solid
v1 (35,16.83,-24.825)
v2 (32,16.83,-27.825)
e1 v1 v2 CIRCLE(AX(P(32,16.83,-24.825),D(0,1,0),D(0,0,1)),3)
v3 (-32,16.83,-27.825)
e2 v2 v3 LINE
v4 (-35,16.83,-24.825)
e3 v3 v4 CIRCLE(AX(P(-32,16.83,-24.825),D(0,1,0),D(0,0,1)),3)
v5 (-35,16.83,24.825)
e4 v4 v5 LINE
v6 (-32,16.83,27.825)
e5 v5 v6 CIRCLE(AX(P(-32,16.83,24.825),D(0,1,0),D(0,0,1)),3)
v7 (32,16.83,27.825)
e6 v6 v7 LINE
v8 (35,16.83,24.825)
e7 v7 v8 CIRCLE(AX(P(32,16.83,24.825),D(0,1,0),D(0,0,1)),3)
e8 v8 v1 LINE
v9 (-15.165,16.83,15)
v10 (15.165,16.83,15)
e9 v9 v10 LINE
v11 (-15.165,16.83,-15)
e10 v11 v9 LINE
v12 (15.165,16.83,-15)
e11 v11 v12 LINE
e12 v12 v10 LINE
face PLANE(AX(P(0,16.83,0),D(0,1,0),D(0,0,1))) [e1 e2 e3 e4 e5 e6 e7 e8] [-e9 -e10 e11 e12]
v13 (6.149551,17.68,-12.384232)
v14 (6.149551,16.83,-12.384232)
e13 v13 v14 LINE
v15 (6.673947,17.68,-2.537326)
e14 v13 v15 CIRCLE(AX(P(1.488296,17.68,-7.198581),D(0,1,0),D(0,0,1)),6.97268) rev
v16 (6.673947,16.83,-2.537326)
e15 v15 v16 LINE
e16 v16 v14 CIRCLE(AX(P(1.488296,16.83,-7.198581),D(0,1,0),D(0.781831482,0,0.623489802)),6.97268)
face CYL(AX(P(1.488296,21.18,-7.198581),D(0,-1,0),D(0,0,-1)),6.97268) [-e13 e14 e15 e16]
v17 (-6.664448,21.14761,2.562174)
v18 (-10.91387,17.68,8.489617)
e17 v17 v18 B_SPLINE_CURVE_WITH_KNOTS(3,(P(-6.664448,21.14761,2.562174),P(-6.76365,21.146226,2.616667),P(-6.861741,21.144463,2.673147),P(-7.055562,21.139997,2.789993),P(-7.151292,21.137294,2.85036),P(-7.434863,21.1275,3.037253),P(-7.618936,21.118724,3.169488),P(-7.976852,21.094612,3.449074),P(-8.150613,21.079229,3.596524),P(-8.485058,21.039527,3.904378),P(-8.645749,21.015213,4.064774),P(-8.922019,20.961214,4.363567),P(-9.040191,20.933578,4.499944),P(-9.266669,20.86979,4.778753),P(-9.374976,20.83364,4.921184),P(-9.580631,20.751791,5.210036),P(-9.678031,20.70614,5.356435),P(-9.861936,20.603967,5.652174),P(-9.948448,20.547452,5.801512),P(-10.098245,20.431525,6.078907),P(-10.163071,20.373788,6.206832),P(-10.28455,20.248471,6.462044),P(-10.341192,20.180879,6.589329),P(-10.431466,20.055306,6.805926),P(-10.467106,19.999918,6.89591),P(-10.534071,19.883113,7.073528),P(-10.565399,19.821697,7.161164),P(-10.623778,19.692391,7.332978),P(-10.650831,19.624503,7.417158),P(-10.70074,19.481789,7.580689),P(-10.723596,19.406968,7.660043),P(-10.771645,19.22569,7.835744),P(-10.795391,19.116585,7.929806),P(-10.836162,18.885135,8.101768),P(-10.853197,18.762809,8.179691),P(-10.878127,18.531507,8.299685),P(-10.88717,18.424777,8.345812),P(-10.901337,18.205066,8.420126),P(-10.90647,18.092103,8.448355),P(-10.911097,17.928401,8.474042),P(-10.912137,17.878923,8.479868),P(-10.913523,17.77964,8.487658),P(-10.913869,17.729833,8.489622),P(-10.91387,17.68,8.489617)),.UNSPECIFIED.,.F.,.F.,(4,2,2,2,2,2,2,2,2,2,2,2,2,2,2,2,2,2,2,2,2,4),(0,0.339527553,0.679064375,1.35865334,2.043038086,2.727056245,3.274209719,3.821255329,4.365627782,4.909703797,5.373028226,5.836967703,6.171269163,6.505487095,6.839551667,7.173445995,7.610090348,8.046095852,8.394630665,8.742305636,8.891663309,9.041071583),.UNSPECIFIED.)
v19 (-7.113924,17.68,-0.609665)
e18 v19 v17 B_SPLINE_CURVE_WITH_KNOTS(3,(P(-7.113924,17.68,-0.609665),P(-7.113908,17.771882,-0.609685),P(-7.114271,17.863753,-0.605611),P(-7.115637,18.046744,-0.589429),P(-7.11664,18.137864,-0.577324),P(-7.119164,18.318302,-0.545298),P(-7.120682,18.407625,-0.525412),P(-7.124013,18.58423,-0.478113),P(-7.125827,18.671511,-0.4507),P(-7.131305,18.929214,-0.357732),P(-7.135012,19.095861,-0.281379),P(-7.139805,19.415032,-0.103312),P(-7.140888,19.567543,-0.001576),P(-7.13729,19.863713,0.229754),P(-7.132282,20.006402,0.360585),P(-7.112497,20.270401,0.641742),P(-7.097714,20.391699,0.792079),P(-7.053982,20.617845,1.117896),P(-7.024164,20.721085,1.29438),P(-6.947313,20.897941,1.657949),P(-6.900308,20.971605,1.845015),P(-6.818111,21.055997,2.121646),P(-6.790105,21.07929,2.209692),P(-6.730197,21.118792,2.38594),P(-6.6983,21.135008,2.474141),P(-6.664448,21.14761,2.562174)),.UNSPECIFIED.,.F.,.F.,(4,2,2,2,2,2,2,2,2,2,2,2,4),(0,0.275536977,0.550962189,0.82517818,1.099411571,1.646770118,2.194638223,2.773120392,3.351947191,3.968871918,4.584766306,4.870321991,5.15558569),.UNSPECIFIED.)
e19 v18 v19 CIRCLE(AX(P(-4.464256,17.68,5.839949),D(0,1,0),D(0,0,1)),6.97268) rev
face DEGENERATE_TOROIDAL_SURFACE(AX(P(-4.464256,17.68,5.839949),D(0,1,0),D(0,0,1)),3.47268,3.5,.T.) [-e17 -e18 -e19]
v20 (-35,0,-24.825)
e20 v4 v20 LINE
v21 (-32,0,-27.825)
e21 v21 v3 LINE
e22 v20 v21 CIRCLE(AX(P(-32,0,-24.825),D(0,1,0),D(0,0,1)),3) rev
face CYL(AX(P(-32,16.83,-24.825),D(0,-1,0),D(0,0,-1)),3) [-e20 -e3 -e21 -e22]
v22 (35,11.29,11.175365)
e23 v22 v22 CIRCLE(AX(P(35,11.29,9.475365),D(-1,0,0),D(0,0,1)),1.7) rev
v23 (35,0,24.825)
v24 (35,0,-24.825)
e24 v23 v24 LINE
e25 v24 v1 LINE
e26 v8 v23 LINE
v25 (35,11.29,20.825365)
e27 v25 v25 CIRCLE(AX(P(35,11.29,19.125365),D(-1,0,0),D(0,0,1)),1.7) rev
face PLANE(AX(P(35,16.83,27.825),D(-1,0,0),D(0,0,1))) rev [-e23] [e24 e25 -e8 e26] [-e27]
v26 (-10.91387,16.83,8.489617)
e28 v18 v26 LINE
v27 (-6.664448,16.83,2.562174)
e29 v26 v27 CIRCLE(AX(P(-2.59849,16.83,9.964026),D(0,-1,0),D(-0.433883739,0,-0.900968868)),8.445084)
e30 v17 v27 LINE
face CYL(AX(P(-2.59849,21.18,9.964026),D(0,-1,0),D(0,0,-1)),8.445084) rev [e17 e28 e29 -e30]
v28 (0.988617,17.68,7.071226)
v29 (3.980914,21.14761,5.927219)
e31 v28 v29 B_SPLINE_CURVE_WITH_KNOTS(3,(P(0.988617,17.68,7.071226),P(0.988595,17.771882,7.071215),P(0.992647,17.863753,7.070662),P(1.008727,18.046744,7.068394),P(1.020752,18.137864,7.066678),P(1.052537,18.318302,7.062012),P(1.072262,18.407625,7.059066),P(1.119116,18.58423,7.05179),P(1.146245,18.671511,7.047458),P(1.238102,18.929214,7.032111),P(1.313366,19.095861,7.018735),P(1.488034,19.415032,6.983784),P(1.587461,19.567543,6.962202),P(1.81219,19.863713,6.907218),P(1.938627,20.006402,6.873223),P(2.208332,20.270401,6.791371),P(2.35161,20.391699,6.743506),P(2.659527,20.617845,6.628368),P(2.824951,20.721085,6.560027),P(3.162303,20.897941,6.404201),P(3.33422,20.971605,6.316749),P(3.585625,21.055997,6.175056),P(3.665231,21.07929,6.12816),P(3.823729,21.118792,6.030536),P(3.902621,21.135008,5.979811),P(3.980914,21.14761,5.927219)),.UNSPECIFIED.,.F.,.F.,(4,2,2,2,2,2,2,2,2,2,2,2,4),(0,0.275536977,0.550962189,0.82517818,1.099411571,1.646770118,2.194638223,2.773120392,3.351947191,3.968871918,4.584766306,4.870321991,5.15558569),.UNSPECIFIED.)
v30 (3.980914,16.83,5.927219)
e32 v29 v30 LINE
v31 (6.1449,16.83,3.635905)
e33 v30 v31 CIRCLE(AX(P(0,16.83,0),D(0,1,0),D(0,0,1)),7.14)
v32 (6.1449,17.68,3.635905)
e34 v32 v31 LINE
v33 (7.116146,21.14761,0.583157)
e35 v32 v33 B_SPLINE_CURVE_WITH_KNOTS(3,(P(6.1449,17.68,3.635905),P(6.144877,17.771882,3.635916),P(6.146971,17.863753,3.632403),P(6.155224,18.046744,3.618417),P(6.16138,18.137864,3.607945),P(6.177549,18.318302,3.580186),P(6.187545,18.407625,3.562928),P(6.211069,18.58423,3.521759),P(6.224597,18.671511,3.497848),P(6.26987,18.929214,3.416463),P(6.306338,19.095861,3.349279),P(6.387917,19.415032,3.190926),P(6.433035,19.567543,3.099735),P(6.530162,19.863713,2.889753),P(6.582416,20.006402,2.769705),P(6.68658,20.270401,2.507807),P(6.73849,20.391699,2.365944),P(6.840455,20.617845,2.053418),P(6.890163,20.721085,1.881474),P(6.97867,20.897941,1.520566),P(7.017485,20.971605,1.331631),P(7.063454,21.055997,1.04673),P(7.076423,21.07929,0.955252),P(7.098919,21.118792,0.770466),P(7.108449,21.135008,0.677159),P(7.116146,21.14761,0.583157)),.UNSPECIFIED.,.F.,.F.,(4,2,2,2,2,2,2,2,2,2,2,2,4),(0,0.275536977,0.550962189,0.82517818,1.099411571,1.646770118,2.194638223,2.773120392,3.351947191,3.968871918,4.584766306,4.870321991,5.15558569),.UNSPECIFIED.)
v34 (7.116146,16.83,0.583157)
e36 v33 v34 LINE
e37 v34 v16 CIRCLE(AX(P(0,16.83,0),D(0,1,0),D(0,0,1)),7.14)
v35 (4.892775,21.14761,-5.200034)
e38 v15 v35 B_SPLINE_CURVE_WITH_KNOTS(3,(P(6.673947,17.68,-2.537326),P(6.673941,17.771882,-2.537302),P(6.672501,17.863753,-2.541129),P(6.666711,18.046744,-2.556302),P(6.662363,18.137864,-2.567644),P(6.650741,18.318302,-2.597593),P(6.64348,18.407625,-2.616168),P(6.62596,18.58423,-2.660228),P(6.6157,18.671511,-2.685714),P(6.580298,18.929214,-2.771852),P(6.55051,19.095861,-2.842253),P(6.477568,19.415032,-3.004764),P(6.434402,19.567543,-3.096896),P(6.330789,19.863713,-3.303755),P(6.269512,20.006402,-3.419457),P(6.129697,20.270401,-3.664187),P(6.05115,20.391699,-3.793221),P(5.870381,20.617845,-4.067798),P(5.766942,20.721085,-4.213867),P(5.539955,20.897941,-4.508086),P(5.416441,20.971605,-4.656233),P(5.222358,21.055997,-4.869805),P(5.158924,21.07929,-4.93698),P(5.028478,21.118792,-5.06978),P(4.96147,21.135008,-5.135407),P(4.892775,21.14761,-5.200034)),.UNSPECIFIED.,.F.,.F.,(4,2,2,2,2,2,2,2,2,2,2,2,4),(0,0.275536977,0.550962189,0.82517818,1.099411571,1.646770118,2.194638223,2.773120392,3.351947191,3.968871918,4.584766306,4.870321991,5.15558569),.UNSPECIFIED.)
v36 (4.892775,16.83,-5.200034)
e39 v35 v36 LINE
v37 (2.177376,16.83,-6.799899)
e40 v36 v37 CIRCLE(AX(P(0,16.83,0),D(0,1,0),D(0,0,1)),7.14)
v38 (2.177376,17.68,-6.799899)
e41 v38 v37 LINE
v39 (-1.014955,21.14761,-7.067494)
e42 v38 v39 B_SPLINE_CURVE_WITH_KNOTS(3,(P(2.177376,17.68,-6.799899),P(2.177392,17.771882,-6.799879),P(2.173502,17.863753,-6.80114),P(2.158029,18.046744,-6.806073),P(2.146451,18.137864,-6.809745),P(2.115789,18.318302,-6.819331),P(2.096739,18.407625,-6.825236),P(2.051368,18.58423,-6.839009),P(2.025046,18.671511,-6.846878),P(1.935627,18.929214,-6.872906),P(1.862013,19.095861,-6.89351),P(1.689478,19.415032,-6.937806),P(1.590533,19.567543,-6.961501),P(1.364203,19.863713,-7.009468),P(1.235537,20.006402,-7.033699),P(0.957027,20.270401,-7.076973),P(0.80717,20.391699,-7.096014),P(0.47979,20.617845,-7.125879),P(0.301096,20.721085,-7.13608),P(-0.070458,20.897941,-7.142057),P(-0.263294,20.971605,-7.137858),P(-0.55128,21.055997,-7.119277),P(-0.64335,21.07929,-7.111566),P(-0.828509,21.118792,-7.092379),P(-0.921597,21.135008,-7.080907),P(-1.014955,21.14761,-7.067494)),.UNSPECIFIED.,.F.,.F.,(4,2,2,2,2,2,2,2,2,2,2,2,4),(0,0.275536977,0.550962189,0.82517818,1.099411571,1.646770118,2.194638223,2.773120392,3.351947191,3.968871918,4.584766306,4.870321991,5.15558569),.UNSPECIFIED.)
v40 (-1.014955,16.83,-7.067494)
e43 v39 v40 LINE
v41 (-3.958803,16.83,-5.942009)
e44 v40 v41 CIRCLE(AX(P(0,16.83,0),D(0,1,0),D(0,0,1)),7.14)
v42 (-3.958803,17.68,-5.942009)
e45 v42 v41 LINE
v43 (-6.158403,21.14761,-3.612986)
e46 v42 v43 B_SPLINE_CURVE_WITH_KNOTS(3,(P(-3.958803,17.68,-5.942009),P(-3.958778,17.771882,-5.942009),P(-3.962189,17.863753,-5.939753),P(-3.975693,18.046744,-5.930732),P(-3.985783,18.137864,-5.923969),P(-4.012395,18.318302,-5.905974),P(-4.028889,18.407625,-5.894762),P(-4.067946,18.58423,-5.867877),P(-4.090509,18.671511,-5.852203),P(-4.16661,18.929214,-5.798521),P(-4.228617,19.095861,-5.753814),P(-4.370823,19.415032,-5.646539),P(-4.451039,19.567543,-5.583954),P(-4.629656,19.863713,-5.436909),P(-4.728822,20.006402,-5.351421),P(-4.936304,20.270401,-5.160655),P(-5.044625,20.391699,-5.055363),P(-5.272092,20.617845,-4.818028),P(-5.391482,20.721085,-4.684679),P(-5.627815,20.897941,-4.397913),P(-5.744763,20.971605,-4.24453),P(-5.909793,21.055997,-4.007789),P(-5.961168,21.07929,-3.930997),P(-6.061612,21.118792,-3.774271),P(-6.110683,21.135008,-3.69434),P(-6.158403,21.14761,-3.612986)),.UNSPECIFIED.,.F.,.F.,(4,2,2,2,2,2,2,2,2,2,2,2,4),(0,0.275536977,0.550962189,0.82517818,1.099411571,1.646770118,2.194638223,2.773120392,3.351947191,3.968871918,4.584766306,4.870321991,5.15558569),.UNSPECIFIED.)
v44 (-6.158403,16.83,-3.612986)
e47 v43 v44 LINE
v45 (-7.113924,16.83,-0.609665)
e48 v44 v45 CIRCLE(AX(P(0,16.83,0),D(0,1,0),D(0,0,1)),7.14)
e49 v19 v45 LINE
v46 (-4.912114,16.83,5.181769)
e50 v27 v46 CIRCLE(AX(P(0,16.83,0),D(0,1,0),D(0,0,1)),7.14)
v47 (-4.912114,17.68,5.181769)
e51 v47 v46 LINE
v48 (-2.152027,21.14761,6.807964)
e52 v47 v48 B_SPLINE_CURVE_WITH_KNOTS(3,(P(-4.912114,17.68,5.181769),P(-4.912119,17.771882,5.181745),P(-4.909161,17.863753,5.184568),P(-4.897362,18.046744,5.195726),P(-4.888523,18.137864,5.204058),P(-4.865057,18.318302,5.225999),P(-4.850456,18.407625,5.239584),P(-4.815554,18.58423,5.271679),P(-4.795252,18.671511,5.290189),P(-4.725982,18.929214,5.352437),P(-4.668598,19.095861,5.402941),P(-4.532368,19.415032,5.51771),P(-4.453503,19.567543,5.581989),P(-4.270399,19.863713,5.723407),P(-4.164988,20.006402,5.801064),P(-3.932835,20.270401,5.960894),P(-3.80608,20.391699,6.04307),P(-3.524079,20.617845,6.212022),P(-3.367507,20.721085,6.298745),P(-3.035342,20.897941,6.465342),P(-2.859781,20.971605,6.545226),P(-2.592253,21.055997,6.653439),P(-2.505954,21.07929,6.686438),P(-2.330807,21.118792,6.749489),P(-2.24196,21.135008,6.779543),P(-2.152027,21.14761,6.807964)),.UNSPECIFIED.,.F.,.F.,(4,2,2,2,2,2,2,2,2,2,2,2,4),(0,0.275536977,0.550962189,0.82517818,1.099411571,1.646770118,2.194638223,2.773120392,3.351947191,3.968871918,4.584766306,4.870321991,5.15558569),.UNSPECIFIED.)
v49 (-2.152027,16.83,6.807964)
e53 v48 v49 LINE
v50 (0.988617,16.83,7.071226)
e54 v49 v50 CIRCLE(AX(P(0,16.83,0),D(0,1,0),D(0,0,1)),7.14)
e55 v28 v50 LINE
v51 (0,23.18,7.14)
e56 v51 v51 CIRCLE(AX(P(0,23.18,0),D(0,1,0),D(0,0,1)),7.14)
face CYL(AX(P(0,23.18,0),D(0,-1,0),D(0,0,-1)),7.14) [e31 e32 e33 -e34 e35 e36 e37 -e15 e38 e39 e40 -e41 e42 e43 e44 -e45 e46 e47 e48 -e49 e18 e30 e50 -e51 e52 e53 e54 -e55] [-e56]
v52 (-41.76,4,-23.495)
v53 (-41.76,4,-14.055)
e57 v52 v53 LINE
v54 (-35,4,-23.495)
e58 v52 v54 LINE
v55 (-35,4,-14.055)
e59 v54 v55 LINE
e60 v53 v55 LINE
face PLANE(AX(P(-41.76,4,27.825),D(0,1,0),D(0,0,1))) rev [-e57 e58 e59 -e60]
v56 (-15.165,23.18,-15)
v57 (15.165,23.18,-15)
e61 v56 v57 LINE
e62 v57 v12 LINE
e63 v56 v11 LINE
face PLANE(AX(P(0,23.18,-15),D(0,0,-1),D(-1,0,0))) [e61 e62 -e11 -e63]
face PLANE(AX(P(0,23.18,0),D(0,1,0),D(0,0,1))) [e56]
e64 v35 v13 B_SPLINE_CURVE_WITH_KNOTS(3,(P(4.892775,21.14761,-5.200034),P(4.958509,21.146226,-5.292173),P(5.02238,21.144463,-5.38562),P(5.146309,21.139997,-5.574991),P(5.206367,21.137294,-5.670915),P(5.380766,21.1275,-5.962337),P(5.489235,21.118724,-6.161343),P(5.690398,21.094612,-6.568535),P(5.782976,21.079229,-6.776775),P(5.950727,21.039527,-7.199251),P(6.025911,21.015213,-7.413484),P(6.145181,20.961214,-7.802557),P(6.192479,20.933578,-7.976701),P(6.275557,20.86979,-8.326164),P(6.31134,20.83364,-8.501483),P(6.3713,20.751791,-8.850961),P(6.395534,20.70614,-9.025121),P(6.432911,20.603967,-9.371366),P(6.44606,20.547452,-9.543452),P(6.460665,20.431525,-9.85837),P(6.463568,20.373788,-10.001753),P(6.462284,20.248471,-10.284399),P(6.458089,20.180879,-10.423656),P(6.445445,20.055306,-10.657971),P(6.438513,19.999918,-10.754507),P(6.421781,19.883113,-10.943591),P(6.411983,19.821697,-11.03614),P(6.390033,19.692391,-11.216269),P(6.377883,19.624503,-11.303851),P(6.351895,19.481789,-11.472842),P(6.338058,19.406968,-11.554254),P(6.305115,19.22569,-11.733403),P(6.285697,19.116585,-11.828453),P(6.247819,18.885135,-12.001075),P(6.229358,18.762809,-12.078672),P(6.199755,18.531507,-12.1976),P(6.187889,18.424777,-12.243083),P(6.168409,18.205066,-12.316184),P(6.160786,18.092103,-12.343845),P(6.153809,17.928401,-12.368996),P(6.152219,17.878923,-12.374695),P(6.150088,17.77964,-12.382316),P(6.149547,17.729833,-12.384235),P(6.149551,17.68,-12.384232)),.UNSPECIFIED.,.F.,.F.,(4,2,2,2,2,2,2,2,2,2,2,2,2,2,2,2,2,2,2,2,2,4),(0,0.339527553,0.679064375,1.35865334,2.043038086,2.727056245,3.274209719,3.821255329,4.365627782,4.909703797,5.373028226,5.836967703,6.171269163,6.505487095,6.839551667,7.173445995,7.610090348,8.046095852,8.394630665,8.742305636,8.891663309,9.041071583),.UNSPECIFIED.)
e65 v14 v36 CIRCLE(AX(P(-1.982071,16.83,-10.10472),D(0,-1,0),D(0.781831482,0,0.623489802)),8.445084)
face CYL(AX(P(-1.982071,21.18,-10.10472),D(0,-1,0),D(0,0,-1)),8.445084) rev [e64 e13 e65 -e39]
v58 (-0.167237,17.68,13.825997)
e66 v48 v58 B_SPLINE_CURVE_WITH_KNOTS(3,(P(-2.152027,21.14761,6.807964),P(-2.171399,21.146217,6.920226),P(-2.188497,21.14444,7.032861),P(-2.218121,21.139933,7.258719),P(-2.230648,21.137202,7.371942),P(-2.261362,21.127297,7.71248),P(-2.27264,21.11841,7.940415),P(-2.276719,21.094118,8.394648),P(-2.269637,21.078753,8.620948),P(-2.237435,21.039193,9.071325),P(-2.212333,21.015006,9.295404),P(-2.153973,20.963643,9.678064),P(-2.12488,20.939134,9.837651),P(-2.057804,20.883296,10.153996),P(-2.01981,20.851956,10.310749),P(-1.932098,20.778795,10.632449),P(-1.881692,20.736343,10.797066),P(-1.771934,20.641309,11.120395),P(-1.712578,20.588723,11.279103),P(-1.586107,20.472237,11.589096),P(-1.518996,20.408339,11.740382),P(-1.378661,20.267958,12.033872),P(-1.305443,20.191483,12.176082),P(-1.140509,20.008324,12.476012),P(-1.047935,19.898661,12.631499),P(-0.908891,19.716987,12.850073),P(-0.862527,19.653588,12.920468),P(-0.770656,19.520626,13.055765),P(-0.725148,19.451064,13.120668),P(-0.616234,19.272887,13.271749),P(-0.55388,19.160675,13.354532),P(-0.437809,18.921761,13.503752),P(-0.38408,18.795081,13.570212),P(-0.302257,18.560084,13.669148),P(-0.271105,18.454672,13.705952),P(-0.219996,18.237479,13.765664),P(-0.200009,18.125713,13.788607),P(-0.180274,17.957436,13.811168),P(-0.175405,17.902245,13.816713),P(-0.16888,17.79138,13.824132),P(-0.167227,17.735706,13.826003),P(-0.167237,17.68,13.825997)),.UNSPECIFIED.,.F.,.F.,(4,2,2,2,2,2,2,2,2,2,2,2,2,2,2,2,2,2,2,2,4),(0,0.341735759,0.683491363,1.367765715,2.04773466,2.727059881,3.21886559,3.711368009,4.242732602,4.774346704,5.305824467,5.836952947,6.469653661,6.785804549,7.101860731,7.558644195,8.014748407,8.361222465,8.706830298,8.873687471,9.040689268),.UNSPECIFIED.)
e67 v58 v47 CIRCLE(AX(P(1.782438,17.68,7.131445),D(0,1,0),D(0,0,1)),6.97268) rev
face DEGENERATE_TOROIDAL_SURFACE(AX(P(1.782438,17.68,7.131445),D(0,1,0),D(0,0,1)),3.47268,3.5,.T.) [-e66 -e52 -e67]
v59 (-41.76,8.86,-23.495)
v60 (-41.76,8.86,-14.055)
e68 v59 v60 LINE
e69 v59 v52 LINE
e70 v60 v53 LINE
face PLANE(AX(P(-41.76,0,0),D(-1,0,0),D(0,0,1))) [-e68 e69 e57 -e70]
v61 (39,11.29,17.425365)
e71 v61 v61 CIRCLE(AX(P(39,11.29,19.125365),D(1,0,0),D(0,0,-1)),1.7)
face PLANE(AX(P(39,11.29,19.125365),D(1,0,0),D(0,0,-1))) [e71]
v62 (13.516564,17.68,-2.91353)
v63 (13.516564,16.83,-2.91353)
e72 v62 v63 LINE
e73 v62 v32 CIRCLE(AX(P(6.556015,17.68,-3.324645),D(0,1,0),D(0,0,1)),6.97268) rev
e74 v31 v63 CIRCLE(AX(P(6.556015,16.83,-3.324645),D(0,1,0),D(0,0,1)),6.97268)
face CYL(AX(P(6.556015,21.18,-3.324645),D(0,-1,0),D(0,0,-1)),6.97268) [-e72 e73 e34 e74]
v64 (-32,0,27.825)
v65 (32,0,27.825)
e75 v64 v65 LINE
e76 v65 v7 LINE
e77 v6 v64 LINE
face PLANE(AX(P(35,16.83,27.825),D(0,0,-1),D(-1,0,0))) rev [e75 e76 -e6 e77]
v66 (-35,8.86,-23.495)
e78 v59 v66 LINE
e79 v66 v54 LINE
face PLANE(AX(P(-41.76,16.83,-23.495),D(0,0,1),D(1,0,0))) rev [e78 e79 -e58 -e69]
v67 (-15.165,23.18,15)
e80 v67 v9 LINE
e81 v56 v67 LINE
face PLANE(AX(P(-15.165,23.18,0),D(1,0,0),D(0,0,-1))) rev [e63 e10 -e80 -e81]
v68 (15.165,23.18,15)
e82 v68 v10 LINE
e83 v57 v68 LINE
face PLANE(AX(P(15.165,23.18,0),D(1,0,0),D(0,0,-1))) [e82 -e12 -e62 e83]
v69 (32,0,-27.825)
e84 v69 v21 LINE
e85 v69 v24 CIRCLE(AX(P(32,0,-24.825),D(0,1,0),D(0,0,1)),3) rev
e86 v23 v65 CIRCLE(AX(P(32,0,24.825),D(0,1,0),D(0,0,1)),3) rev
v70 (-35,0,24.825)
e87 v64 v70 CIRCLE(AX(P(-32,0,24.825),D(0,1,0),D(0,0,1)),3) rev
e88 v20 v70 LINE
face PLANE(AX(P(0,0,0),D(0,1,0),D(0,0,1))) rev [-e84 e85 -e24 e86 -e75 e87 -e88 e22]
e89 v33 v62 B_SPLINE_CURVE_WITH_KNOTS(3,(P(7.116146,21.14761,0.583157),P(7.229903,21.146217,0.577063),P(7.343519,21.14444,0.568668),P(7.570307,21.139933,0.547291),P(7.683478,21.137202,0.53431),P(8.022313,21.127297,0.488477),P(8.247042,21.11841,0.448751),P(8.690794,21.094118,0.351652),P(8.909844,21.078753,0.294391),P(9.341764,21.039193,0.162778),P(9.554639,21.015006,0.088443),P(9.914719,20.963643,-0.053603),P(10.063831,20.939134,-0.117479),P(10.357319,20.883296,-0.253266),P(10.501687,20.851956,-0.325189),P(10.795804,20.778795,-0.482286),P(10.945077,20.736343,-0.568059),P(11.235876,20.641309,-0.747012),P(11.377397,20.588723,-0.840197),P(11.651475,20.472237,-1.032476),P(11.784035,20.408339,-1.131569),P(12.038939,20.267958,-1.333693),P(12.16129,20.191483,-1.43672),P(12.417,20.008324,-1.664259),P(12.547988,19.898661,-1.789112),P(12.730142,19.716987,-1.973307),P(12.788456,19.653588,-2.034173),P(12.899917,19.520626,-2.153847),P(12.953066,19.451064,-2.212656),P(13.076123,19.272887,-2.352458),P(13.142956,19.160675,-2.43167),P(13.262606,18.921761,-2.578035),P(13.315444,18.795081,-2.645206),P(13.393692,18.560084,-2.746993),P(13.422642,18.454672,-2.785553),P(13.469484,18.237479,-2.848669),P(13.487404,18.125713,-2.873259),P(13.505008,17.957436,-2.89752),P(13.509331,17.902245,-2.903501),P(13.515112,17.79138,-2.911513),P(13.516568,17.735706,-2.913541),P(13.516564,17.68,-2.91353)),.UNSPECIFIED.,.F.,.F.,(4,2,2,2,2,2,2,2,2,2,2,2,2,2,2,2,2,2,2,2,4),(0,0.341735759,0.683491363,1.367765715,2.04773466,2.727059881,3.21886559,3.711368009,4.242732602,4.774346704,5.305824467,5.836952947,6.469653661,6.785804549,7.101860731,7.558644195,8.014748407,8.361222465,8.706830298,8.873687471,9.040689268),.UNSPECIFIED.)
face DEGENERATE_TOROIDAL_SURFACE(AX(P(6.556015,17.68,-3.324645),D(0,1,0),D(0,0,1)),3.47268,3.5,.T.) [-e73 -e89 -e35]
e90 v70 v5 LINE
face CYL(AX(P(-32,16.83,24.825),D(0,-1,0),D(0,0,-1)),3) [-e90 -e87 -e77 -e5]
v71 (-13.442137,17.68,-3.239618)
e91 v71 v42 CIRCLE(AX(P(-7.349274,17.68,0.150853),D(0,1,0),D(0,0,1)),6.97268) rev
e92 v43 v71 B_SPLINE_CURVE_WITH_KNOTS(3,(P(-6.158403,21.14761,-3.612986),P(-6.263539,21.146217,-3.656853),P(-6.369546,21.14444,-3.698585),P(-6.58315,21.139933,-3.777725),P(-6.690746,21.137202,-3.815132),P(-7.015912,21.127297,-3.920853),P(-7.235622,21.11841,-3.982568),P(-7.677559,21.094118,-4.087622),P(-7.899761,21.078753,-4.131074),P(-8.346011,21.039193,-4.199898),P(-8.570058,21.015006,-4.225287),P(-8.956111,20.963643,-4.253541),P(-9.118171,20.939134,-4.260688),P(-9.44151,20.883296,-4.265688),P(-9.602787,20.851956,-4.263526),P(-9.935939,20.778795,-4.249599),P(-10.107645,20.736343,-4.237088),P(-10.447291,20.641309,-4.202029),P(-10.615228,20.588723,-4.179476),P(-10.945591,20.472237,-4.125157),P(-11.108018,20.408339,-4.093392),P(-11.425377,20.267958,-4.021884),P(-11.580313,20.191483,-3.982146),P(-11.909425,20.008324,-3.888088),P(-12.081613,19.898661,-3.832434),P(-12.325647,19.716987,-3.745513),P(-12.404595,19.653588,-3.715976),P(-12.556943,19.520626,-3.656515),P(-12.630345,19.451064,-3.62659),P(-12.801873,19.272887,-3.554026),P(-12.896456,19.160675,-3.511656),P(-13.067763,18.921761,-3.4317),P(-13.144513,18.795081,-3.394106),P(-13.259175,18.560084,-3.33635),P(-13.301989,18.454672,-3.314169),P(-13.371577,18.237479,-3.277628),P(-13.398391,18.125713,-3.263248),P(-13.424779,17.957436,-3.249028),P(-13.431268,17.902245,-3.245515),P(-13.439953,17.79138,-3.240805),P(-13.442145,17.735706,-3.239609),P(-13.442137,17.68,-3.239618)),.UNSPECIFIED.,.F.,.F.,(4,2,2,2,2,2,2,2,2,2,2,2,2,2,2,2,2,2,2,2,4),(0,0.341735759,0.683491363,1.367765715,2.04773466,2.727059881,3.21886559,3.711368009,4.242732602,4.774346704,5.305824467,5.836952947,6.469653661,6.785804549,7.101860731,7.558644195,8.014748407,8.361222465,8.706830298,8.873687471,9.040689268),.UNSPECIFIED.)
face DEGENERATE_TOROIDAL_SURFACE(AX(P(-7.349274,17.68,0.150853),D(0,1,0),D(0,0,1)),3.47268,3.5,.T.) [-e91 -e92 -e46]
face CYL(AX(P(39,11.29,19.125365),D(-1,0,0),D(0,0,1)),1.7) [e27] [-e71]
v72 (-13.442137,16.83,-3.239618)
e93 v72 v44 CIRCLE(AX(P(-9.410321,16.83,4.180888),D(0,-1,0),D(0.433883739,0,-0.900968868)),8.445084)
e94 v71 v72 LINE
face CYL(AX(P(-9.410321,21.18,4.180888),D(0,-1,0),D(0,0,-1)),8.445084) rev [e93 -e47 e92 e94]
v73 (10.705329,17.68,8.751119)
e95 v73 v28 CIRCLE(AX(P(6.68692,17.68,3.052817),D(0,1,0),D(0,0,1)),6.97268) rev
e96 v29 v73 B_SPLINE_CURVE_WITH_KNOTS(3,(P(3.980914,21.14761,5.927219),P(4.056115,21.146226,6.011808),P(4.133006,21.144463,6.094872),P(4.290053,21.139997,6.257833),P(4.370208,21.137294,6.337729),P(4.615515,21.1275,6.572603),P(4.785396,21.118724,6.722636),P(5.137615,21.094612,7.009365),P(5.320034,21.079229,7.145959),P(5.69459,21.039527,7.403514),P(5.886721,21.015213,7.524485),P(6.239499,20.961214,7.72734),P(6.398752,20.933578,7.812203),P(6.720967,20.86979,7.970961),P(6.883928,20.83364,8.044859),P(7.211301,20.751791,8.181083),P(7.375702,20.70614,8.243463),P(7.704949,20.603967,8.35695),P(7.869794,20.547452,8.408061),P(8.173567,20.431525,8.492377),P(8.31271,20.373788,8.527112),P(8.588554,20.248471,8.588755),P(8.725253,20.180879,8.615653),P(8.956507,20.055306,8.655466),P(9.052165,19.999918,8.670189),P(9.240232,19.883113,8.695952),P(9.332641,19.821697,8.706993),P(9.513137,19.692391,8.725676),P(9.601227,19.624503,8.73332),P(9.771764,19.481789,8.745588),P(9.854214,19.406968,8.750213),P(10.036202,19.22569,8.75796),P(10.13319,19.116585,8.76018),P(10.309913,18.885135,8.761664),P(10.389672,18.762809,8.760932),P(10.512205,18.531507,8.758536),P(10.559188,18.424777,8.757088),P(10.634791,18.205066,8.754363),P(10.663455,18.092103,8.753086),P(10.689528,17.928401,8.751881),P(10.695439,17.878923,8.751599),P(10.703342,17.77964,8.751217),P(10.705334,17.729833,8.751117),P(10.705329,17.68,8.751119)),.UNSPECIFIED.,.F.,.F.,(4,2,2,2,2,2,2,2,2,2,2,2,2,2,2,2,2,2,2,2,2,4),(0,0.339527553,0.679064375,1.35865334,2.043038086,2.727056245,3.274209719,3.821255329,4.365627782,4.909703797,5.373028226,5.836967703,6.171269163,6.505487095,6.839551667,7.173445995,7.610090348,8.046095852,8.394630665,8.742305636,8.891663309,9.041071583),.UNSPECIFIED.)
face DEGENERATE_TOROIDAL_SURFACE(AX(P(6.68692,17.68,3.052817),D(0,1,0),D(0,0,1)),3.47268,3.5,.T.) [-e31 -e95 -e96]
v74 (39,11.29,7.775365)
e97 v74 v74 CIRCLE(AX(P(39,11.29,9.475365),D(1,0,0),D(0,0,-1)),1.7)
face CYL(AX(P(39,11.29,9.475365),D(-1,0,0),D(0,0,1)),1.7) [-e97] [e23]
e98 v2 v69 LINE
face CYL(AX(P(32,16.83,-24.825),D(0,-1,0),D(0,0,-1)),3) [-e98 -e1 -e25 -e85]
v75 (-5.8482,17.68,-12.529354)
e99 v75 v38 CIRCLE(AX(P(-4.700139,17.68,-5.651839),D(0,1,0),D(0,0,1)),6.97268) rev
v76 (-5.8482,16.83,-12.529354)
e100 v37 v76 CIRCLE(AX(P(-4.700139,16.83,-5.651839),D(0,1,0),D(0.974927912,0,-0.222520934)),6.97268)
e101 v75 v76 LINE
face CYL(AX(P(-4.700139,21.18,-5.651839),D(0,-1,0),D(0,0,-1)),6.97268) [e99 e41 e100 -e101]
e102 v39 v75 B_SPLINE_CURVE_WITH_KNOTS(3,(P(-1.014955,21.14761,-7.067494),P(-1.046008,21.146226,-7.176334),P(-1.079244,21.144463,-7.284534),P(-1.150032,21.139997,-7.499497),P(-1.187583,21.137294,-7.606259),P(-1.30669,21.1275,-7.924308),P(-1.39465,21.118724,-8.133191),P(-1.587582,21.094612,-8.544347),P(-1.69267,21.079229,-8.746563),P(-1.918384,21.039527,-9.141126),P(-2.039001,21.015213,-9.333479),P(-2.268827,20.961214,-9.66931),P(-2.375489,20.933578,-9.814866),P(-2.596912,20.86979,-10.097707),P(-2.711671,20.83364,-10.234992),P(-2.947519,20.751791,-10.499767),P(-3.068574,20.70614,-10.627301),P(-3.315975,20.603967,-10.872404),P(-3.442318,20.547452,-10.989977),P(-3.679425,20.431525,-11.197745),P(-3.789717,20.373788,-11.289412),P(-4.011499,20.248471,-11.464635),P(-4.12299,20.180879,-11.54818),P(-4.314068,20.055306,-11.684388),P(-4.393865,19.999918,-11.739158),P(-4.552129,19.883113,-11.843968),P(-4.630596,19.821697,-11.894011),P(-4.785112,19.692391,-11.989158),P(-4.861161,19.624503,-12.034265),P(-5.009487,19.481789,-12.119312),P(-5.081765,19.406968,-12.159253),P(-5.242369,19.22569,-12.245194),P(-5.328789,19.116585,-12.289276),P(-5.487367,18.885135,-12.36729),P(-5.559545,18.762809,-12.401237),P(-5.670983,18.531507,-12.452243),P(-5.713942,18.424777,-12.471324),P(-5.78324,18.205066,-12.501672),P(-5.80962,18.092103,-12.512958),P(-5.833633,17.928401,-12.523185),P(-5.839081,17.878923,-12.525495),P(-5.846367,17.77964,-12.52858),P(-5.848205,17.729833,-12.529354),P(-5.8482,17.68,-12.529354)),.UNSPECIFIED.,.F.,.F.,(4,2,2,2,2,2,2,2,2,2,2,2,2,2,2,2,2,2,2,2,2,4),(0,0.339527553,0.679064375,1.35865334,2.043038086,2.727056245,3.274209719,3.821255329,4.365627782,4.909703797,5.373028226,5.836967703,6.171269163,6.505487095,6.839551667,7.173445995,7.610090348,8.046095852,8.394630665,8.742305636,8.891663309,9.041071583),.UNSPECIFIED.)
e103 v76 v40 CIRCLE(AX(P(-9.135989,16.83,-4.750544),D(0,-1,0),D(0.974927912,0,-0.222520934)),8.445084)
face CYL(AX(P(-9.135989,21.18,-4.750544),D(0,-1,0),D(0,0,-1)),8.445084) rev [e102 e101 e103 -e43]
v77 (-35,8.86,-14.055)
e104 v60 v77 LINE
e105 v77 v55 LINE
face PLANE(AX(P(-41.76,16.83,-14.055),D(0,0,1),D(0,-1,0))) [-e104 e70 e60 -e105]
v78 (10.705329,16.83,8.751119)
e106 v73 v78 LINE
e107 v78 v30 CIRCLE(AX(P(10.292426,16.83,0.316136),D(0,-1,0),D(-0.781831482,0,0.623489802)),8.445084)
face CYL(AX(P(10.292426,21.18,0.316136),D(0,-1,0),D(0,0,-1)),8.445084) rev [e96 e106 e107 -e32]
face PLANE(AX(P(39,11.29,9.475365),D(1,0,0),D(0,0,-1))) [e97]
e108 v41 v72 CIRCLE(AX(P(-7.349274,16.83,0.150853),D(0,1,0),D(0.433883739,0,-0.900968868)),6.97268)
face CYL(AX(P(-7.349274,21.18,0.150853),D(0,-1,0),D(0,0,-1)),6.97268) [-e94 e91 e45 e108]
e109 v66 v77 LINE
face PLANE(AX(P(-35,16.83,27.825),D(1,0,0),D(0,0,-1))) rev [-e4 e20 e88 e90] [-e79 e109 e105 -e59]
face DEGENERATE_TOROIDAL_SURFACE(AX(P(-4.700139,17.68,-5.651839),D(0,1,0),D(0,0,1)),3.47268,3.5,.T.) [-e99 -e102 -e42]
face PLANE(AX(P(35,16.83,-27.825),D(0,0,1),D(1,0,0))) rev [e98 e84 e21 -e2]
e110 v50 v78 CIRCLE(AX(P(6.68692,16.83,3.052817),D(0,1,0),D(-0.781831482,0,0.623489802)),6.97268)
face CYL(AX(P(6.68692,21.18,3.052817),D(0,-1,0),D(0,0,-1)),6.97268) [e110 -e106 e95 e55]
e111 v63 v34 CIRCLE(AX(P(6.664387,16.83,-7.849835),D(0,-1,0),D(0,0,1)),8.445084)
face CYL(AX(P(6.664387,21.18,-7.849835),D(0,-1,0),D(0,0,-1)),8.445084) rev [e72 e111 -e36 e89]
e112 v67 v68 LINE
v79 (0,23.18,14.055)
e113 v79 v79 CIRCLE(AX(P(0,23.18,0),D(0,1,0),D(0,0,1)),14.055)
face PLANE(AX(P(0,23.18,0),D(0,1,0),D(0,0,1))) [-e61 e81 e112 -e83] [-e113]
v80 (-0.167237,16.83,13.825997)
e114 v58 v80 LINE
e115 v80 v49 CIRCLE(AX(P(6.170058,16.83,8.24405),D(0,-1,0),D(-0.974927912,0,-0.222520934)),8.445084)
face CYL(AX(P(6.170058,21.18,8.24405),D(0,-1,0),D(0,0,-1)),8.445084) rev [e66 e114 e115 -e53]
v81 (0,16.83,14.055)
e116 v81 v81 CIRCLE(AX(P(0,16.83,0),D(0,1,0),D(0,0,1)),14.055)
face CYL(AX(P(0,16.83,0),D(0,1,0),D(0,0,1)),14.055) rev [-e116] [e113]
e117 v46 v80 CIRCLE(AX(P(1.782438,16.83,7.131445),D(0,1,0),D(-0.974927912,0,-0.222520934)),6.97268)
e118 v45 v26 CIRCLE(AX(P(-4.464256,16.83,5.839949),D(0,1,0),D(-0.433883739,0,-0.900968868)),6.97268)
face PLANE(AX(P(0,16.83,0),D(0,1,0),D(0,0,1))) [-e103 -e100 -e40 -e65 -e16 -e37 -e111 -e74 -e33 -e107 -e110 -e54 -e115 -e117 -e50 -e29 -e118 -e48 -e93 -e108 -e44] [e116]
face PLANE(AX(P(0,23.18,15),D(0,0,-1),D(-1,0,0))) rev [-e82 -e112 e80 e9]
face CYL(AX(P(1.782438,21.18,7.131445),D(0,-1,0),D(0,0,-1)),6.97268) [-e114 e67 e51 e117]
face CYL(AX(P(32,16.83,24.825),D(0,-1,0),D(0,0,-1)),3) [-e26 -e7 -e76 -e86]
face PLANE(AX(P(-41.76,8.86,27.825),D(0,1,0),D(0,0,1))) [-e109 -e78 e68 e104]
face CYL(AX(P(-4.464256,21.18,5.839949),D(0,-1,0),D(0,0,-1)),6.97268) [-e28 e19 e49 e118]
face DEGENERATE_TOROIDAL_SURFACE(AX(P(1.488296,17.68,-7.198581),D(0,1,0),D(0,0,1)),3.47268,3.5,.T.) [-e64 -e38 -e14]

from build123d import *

# Parameters (mm, degrees)
SKETCH1_W           = 70
SKETCH1_H           = 55.65
BOSS_EXTRUDE1_DEPTH = 16.83
BOSS_EXTRUDE2_START = 16.83
SKETCH2_W           = 30.33
SKETCH2_H           = 30
BOSS_EXTRUDE2_DEPTH = 6.35
SKETCH3_R           = 14.055
BOSS_EXTRUDE3_DEPTH = 6.35
SKETCH4_R           = 14.055
CUT_EXTRUDE1_DEPTH  = 6.35
BOSS_EXTRUDE4_START = -35
SKETCH5_W           = 9.44
SKETCH5_H           = 4.86
BOSS_EXTRUDE4_DEPTH = 6.76
SKETCH6_R           = 1.7
BOSS_EXTRUDE5_DEPTH = 4
FILLET1_R           = 3
SKETCH7_R           = 7.14
BOSS_EXTRUDE6_DEPTH = 6.35
BOSS_EXTRUDE7_DEPTH = 4.35
FILLET3_R           = 3.5
CIRPATTERN11_COUNT  = 7
FILLET4_R           = 3.5


with BuildPart() as part:
    # Sketch1 → Boss-Extrude1 (new body)
    with BuildSketch(Plane(origin=(0, 0, 0), x_dir=(1, 0, 0), z_dir=(0, 1, 0))):
        Rectangle(SKETCH1_W, SKETCH1_H)
    extrude(amount=BOSS_EXTRUDE1_DEPTH)

    # Sketch2 → Boss-Extrude2 (add)
    with BuildSketch(Plane(origin=(0, 0, 0), x_dir=(1, 0, 0), z_dir=(0, 1, 0)).offset(BOSS_EXTRUDE2_START)):
        Rectangle(SKETCH2_W, SKETCH2_H)
    extrude(amount=BOSS_EXTRUDE2_DEPTH)

    # Sketch3 → Boss-Extrude3 (add)
    with BuildSketch(Plane(origin=(0, 23.18, 0), x_dir=(1, 0, 0), z_dir=(0, 1, 0))):
        Circle(SKETCH3_R)
    extrude(amount=-BOSS_EXTRUDE3_DEPTH)

    # Sketch4 → Cut-Extrude1 (cut)
    with BuildSketch(Plane(origin=(0, 23.18, 0), x_dir=(1, 0, 0), z_dir=(0, 1, 0))):
        with Locations(Location((0, 0, 0), (0, 0, 270))):
            Circle(SKETCH4_R)
    extrude(amount=-CUT_EXTRUDE1_DEPTH, mode=Mode.SUBTRACT)

    # Sketch5 → Boss-Extrude4 (add)
    with BuildSketch(Plane(origin=(0, 0, 0), x_dir=(0, 0, -1), z_dir=(1, 0, 0)).offset(BOSS_EXTRUDE4_START)):
        with Locations((18.775, 6.43)):
            Rectangle(SKETCH5_W, SKETCH5_H)
    extrude(amount=-BOSS_EXTRUDE4_DEPTH)

    # Sketch6 → Boss-Extrude5 (add)
    with BuildSketch(Plane(origin=(35, 0, 0), x_dir=(0, 0, -1), z_dir=(1, 0, 0))):
        with Locations(Location((-19.125364984, 11.29, 0), (0, 0, 180))):
            Circle(SKETCH6_R)
        with Locations(Location((-9.475364984, 11.29, 0), (0, 0, 180))):
            Circle(SKETCH6_R)
    extrude(amount=BOSS_EXTRUDE5_DEPTH)

    # Fillet1
    fillet1_edges = [part.edges().sort_by_distance(p)[0] for p in [
        (-35, 8.415, -27.825),
        (35, 8.415, -27.825),
        (35, 8.415, 27.825),
        (-35, 8.415, 27.825),
    ]]
    fillet(fillet1_edges, radius=FILLET1_R)

    # Sketch7 → Boss-Extrude6 (add)
    with BuildSketch(Plane(origin=(0, 16.83, 0), x_dir=(1, 0, 0), z_dir=(0, 1, 0))):
        with Locations(Location((0, 0, 0), (0, 0, 270))):
            Circle(SKETCH7_R)
    extrude(amount=BOSS_EXTRUDE6_DEPTH)

    # Sketch11 → Boss-Extrude7 (add)
    with BuildSketch(Plane(origin=(0, 16.83, 0), x_dir=(1, 0, 0), z_dir=(0, 1, 0))):
        with BuildLine():
            ThreePointArc((7.116145586, -0.583156929), (6.803943672, -2.164705639), (6.144899887, -3.635905029))
            ThreePointArc((6.144899887, -3.635905029), (11.187164412, -1.887909247), (13.51656418, 2.913529862))
            ThreePointArc((13.51656418, 2.913529862), (10.713284894, 0.438636341), (7.116145586, -0.583156929))
        make_face()
    boss_extrude7 = extrude(amount=BOSS_EXTRUDE7_DEPTH)

    # Fillet3
    # the kernel refuses this fillet: 3.5 mm, written as the material it takes off along each edge
    with BuildSketch(Plane(origin=(6.556014588, 21.18, -3.324644563), x_dir=(-0.9673093233437143, 0, 0.25359943409307006), z_dir=(-0.25359943409307006, 0, -0.9673093233437143))) as fillet3_piece_1_section:
        with BuildLine():
            CenterArc((6.972679966 - FILLET3_R, -FILLET3_R), FILLET3_R, 0, 90)
            Line((6.972679966 - FILLET3_R, 0), (6.972679966, 0))
            Line((6.972679966, 0), (6.972679966, -FILLET3_R))
        make_face()
    fillet3_piece_1 = revolve(axis=Axis((6.556014588, 21.18, -3.324644563), (0, 1, 0)), revolution_arc=233.858448906, mode=Mode.PRIVATE)
    fillet3_piece_1 = fillet3_piece_1 - Plane(origin=(0, 20.294110175, 0), x_dir=(0, 0, 1), z_dir=(0, -1, 0)) * Cylinder(7.14, 28, mode=Mode.PRIVATE)
    fillet3_piece_1 = fillet3_piece_1 - Plane(origin=(6.664387144, 20.294110175, -7.849834998), x_dir=(0.8113805957786566, 0, 0.5845182022776301), z_dir=(0, -1, 0)) * Cylinder(8.445083689, 28, mode=Mode.PRIVATE)
    add(fillet3_piece_1, mode=Mode.SUBTRACT)

    # CirPattern11: Boss-Extrude7 ×7 about axis
    cirpattern11_axis = Axis((0, 0, 0), (0, 1, 0))
    for i in range(1, CIRPATTERN11_COUNT):
        add(boss_extrude7.rotate(cirpattern11_axis, i * 360 / CIRPATTERN11_COUNT))

    # Fillet4
    # the kernel refuses this fillet: 3.5 mm, written as the material it takes off along each edge
    with BuildSketch(Plane(origin=(6.686920024, 21.18, 3.052816625), x_dir=(-0.8013795198577165, 0, -0.5981562213607877), z_dir=(0.5981562213607877, 0, -0.8013795198577165))) as fillet4_piece_1_section:
        with BuildLine():
            CenterArc((6.972679966 - FILLET4_R, -FILLET4_R), FILLET4_R, 0, 90)
            Line((6.972679966 - FILLET4_R, 0), (6.972679966, 0))
            Line((6.972679966, 0), (6.972679966, -FILLET4_R))
        make_face()
    fillet4_piece_1 = revolve(axis=Axis((6.686920024, 21.18, 3.052816625), (0, 1, 0)), revolution_arc=233.858448906, mode=Mode.PRIVATE)
    fillet4_piece_1 = fillet4_piece_1 - Plane(origin=(0, 20.294110175, 0), x_dir=(0, 0, 1), z_dir=(0, -1, 0)) * Cylinder(7.14, 28, mode=Mode.PRIVATE)
    fillet4_piece_1 = fillet4_piece_1 - Plane(origin=(10.292425554, 20.294110175, 0.316135614), x_dir=(0.04889279427778842, 0, 0.998804032164323), z_dir=(0, -1, 0)) * Cylinder(8.445083689, 28, mode=Mode.PRIVATE)
    add(fillet4_piece_1, mode=Mode.SUBTRACT)
    with BuildSketch(Plane(origin=(1.782438293, 21.18, 7.131444628), x_dir=(-0.0319945927557557, 0, -0.9994880419666827), z_dir=(0.9994880419666827, 0, -0.0319945927557557))) as fillet4_piece_2_section:
        with BuildLine():
            CenterArc((6.972679966 - FILLET4_R, -FILLET4_R), FILLET4_R, 0, 90)
            Line((6.972679966 - FILLET4_R, 0), (6.972679966, 0))
            Line((6.972679966, 0), (6.972679966, -FILLET4_R))
        make_face()
    fillet4_piece_2 = revolve(axis=Axis((1.782438293, 21.18, 7.131444628), (0, 1, 0)), revolution_arc=233.858448906, mode=Mode.PRIVATE)
    fillet4_piece_2 = fillet4_piece_2 & Plane(origin=(0, 20.294110175, 0), x_dir=(0, 0, 1), z_dir=(0, 1, 0)) * Cylinder(14.055, 28, mode=Mode.PRIVATE)
    fillet4_piece_2 = fillet4_piece_2 - Plane(origin=(0, 20.294110175, 0), x_dir=(0, 0, 1), z_dir=(0, -1, 0)) * Cylinder(7.14, 28, mode=Mode.PRIVATE)
    add(fillet4_piece_2, mode=Mode.SUBTRACT)
    with BuildSketch(Plane(origin=(-4.464255827, 21.18, 5.839949371), x_dir=(0.7614829152620437, 0, -0.6481849811311732), z_dir=(0.6481849811311732, 0, 0.7614829152620437))) as fillet4_piece_3_section:
        with BuildLine():
            CenterArc((6.972679966 - FILLET4_R, -FILLET4_R), FILLET4_R, 0, 90)
            Line((6.972679966 - FILLET4_R, 0), (6.972679966, 0))
            Line((6.972679966, 0), (6.972679966, -FILLET4_R))
        make_face()
    fillet4_piece_3 = revolve(axis=Axis((-4.464255827, 21.18, 5.839949371), (0, 1, 0)), revolution_arc=233.858448906, mode=Mode.PRIVATE)
    fillet4_piece_3 = fillet4_piece_3 & Plane(origin=(0, 20.294110175, 0), x_dir=(0, 0, 1), z_dir=(0, 1, 0)) * Cylinder(14.055, 28, mode=Mode.PRIVATE)
    fillet4_piece_3 = fillet4_piece_3 - Plane(origin=(0, 20.294110175, 0), x_dir=(0, 0, 1), z_dir=(0, -1, 0)) * Cylinder(7.14, 28, mode=Mode.PRIVATE)
    add(fillet4_piece_3, mode=Mode.SUBTRACT)
    with BuildSketch(Plane(origin=(-7.349274256, 21.18, 0.150853125), x_dir=(0.9815482566668393, 0, 0.19121459106011865), z_dir=(-0.19121459106011865, 0, 0.9815482566668393))) as fillet4_piece_4_section:
        with BuildLine():
            CenterArc((6.972679966 - FILLET4_R, -FILLET4_R), FILLET4_R, 0, 90)
            Line((6.972679966 - FILLET4_R, 0), (6.972679966, 0))
            Line((6.972679966, 0), (6.972679966, -FILLET4_R))
        make_face()
    fillet4_piece_4 = revolve(axis=Axis((-7.349274256, 21.18, 0.150853125), (0, 1, 0)), revolution_arc=233.858448906, mode=Mode.PRIVATE)
    fillet4_piece_4 = fillet4_piece_4 & Plane(origin=(0, 20.294110175, 0), x_dir=(0, 0, 1), z_dir=(0, 1, 0)) * Cylinder(14.055, 28, mode=Mode.PRIVATE)
    fillet4_piece_4 = fillet4_piece_4 - Plane(origin=(0, 20.294110175, 0), x_dir=(0, 0, 1), z_dir=(0, -1, 0)) * Cylinder(7.14, 28, mode=Mode.PRIVATE)
    add(fillet4_piece_4, mode=Mode.SUBTRACT)
    with BuildSketch(Plane(origin=(-4.700139271, 21.18, -5.651838602), x_dir=(0.4624877408659423, 0, 0.8866256761163174), z_dir=(-0.8866256761163174, 0, 0.4624877408659423))) as fillet4_piece_5_section:
        with BuildLine():
            CenterArc((6.972679966 - FILLET4_R, -FILLET4_R), FILLET4_R, 0, 90)
            Line((6.972679966 - FILLET4_R, 0), (6.972679966, 0))
            Line((6.972679966, 0), (6.972679966, -FILLET4_R))
        make_face()
    fillet4_piece_5 = revolve(axis=Axis((-4.700139271, 21.18, -5.651838602), (0, 1, 0)), revolution_arc=233.858448906, mode=Mode.PRIVATE)
    fillet4_piece_5 = fillet4_piece_5 & Plane(origin=(0, 20.294110175, 0), x_dir=(0, 0, 1), z_dir=(0, 1, 0)) * Cylinder(14.055, 28, mode=Mode.PRIVATE)
    fillet4_piece_5 = fillet4_piece_5 - Plane(origin=(0, 20.294110175, 0), x_dir=(0, 0, 1), z_dir=(0, -1, 0)) * Cylinder(7.14, 28, mode=Mode.PRIVATE)
    add(fillet4_piece_5, mode=Mode.SUBTRACT)
    with BuildSketch(Plane(origin=(1.488296449, 21.18, -7.198580584), x_dir=(-0.4048354768376397, 0, 0.9143895431891382), z_dir=(-0.9143895431891382, 0, -0.4048354768376397))) as fillet4_piece_6_section:
        with BuildLine():
            CenterArc((6.972679966 - FILLET4_R, -FILLET4_R), FILLET4_R, 0, 90)
            Line((6.972679966 - FILLET4_R, 0), (6.972679966, 0))
            Line((6.972679966, 0), (6.972679966, -FILLET4_R))
        make_face()
    fillet4_piece_6 = revolve(axis=Axis((1.488296449, 21.18, -7.198580584), (0, 1, 0)), revolution_arc=233.858448906, mode=Mode.PRIVATE)
    fillet4_piece_6 = fillet4_piece_6 & Plane(origin=(0, 20.294110175, 0), x_dir=(0, 0, 1), z_dir=(0, 1, 0)) * Cylinder(14.055, 28, mode=Mode.PRIVATE)
    fillet4_piece_6 = fillet4_piece_6 - Plane(origin=(0, 20.294110175, 0), x_dir=(0, 0, 1), z_dir=(0, -1, 0)) * Cylinder(7.14, 28, mode=Mode.PRIVATE)
    add(fillet4_piece_6, mode=Mode.SUBTRACT)


solid = part.part
